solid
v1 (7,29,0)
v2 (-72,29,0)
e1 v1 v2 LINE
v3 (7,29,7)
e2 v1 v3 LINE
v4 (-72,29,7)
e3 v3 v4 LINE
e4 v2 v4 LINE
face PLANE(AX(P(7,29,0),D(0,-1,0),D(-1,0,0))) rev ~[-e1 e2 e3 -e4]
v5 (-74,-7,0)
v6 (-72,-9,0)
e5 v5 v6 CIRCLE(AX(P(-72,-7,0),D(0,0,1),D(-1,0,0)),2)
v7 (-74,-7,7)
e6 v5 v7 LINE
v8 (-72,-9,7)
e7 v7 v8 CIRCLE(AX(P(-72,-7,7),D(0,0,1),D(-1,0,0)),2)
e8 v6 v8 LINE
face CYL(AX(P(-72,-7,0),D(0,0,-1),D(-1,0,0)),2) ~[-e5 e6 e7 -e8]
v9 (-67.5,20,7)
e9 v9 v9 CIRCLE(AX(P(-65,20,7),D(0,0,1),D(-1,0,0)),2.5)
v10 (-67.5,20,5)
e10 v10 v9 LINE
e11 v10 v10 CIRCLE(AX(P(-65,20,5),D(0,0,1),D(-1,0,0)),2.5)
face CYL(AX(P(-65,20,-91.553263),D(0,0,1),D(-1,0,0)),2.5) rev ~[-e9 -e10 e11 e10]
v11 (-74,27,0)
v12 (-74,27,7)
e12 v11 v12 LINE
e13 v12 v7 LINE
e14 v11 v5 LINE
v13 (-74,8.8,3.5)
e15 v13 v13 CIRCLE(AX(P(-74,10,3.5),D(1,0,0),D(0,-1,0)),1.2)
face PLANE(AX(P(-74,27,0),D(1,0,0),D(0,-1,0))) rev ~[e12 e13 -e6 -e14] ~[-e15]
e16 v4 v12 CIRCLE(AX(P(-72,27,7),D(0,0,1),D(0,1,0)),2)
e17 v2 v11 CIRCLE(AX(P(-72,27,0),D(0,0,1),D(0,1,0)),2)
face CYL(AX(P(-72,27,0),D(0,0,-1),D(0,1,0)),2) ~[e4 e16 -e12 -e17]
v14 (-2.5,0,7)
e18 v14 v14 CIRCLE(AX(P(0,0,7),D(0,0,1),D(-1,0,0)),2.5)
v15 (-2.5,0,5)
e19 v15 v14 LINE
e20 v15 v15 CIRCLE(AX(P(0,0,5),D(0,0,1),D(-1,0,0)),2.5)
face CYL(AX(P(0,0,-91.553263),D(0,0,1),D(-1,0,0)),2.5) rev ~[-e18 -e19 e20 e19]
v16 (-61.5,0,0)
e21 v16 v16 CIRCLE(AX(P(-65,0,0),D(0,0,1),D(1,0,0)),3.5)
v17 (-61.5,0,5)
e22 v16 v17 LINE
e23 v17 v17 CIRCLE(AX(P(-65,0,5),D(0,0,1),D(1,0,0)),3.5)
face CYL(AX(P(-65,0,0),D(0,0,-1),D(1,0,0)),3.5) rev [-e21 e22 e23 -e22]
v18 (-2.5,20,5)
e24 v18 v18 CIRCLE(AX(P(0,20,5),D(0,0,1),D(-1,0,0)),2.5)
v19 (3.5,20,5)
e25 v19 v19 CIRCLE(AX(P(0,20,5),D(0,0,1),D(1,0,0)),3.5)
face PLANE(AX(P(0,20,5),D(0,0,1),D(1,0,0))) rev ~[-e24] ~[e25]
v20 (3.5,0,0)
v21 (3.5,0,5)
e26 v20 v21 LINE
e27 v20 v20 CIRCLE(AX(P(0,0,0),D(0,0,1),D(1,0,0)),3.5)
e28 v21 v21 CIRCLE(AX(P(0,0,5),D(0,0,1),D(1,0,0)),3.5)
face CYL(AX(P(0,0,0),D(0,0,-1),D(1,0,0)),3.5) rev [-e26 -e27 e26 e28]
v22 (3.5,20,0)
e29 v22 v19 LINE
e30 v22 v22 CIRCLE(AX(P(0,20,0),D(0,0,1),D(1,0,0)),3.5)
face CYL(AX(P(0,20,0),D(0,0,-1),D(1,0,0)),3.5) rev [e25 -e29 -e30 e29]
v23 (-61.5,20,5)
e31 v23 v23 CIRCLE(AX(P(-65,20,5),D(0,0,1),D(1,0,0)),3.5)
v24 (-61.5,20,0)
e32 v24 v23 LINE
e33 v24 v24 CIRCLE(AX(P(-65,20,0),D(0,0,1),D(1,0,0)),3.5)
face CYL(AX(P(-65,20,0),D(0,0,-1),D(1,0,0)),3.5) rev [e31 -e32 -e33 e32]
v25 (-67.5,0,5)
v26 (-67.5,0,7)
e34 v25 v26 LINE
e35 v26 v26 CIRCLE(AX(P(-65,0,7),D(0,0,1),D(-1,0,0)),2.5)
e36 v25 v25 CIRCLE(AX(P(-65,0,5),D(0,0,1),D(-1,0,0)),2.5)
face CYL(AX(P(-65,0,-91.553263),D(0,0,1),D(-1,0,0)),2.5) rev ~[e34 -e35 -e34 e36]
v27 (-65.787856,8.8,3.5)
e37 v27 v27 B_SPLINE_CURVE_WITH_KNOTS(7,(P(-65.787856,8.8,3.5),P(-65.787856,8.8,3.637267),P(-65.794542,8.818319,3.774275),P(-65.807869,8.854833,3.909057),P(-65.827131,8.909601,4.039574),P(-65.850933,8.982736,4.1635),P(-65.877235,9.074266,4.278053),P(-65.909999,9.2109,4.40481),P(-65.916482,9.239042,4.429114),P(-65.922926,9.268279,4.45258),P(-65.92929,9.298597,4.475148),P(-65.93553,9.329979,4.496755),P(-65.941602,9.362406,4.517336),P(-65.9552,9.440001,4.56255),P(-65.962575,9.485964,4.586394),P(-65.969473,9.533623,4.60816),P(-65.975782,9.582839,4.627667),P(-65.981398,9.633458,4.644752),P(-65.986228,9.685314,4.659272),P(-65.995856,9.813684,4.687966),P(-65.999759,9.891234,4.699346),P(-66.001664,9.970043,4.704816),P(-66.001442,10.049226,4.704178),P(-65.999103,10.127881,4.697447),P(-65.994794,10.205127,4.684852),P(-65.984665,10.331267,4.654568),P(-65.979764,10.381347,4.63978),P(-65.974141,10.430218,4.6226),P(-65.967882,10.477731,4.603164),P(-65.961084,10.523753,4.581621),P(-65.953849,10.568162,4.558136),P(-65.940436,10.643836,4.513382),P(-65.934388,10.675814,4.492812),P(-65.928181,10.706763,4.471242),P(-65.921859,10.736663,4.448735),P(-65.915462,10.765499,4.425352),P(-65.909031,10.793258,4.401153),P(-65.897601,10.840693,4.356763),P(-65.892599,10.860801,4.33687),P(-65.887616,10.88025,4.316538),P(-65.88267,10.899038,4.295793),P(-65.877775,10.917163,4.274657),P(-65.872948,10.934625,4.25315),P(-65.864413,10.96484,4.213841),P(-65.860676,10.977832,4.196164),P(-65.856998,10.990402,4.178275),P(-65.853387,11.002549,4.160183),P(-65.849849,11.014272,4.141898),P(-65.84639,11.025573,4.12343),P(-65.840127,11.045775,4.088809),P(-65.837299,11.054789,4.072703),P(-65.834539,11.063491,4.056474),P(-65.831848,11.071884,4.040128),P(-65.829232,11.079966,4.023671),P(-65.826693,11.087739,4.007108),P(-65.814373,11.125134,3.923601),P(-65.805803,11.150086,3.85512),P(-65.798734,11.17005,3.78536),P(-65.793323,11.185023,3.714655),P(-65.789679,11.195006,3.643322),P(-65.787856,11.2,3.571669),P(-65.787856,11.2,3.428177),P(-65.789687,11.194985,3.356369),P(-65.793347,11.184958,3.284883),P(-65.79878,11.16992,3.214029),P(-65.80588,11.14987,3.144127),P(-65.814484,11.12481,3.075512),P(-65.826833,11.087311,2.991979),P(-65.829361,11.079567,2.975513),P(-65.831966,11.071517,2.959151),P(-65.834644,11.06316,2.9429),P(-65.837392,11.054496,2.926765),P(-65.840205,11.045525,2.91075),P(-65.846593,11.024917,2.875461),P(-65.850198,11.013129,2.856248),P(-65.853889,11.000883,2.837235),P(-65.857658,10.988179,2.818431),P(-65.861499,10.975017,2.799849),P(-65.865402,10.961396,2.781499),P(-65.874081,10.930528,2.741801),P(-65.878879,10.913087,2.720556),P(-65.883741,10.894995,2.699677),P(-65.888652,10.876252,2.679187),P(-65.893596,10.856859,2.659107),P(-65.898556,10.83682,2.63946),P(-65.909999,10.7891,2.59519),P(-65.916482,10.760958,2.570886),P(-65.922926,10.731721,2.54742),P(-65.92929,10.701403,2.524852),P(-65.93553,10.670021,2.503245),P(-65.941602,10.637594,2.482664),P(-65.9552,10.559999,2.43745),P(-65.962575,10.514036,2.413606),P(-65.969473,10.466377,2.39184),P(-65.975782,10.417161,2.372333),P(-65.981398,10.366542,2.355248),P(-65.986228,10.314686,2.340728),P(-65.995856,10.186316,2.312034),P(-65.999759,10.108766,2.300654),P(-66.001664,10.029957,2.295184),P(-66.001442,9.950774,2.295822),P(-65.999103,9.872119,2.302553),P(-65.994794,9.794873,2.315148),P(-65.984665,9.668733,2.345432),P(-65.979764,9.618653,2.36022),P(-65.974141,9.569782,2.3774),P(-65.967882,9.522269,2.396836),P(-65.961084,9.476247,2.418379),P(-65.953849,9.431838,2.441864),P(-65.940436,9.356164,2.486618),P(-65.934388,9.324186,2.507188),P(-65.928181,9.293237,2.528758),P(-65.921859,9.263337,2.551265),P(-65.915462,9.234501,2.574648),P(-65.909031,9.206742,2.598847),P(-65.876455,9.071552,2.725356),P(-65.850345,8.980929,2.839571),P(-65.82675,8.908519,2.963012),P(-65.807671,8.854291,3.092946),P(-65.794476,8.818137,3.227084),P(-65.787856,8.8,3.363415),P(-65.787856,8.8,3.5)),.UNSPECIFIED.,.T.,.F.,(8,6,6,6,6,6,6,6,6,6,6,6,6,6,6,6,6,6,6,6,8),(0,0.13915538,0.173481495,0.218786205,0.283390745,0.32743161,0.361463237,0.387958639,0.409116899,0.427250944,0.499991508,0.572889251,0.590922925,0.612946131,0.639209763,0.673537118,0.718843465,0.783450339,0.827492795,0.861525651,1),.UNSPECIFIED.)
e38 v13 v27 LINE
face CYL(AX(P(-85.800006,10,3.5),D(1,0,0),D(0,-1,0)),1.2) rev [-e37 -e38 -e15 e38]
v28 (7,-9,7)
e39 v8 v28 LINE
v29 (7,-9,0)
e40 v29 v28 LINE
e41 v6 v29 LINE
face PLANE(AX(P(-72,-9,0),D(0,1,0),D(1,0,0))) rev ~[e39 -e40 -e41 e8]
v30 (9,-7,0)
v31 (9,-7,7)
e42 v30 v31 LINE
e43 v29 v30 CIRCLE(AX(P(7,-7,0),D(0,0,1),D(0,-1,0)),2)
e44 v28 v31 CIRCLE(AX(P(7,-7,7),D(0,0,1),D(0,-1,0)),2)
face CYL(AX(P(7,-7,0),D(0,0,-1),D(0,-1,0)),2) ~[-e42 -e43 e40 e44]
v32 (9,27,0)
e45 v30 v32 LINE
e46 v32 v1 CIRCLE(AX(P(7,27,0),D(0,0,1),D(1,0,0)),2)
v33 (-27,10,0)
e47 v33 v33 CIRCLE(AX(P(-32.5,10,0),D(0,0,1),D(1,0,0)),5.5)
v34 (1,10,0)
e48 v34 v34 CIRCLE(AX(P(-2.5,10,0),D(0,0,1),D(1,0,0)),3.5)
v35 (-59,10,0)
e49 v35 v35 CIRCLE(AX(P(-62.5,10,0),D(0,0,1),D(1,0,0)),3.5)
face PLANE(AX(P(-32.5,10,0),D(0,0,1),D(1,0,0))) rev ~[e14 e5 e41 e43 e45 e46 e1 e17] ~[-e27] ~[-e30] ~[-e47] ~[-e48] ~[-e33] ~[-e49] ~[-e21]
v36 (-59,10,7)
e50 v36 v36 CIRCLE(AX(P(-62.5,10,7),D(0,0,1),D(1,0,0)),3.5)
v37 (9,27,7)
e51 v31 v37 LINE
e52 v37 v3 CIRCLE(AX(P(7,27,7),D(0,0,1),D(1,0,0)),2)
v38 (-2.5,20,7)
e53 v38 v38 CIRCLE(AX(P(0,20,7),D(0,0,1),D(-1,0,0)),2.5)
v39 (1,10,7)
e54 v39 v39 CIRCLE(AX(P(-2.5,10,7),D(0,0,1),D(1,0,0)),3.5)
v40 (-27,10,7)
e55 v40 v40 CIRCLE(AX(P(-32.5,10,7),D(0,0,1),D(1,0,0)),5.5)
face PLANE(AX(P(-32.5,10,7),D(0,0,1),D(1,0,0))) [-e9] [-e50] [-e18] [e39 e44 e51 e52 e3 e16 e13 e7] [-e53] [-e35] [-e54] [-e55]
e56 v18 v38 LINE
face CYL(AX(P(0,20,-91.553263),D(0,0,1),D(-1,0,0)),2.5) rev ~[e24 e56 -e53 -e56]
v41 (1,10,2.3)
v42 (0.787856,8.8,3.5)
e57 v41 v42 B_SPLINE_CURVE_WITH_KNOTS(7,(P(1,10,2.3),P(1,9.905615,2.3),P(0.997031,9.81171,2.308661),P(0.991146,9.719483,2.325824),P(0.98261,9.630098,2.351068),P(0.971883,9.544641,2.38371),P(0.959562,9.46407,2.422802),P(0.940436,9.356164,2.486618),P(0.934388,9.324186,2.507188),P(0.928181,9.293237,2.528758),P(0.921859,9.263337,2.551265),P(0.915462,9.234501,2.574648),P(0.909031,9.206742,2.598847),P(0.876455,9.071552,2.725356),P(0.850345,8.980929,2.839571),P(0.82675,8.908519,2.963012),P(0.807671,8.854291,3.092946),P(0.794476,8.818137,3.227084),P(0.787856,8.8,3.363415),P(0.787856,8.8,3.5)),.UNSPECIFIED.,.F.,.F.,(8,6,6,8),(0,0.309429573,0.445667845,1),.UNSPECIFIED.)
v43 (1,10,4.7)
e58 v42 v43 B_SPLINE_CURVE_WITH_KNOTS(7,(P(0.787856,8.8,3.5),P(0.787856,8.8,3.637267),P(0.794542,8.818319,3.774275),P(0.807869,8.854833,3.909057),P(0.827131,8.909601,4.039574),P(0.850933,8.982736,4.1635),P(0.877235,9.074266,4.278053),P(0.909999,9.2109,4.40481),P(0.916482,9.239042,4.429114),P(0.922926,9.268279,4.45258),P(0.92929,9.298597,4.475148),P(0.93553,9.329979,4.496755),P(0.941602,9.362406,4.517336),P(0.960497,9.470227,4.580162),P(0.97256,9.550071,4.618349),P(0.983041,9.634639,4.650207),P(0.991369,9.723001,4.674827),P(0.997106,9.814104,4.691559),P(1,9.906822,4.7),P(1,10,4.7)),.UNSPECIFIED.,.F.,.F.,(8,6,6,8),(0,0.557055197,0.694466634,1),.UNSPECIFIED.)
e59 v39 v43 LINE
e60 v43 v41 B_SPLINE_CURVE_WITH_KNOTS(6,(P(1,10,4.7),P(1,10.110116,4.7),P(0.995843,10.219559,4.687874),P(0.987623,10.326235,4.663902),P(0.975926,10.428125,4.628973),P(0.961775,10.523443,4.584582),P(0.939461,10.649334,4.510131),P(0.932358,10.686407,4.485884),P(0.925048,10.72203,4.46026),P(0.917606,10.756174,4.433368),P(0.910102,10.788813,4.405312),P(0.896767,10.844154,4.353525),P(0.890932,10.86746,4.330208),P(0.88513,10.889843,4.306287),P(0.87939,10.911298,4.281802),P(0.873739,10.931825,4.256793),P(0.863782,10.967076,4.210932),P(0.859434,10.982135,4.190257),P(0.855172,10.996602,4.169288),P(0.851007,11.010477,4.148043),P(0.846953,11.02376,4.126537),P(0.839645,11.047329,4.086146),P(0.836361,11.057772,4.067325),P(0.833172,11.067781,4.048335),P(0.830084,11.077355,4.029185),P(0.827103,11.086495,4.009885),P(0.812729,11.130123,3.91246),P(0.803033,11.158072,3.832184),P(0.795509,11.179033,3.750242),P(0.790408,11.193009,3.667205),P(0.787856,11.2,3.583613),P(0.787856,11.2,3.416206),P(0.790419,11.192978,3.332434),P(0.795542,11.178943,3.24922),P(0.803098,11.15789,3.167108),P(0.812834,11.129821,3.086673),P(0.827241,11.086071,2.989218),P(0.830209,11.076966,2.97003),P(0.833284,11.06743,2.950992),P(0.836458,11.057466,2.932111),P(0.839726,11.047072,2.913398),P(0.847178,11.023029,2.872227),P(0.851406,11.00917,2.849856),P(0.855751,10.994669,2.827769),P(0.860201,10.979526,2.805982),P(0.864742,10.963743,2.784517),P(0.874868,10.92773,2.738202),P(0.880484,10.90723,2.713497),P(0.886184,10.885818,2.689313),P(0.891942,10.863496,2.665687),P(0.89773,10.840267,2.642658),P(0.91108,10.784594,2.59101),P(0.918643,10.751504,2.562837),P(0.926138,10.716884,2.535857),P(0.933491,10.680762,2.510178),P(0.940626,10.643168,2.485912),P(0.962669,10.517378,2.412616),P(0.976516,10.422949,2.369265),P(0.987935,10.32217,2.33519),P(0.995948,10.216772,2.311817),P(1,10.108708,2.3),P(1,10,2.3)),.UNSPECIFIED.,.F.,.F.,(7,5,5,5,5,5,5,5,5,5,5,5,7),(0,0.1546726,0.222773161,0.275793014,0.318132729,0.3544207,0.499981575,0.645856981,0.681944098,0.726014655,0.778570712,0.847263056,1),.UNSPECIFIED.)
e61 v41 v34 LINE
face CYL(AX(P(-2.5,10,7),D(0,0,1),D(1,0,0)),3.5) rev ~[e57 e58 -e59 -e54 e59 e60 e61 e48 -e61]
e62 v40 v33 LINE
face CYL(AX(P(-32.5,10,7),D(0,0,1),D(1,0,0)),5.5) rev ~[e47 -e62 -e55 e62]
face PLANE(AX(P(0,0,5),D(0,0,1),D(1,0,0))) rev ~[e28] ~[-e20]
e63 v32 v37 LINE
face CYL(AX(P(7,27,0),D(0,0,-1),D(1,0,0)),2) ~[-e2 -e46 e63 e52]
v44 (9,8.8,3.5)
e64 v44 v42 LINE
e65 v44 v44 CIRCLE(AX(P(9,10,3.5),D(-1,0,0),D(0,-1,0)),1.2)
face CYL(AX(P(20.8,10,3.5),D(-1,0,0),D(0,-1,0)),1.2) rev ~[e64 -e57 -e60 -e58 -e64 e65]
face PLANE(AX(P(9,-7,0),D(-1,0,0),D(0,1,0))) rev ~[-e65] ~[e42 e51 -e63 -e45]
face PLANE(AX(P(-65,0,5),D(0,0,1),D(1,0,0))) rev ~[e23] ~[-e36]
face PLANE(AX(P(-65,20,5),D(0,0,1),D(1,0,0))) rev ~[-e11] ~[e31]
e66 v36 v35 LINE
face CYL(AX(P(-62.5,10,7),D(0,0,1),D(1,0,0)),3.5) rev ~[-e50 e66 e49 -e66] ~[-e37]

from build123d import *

# Parameters (mm, degrees)
F0_W      = 65
F0_H      = 20
F1_DEPTH  = 7
F2_D      = 5
F3_R      = 3.5
F4_DEPTH  = 25
F6_D      = 2.4
F6_DEPTH  = 11.8
F6_TIP    = 0.7210327428
F8_R      = 5.5
F9_DEPTH  = 25
F10_R     = 3.5
F11_DEPTH = 5


# Not quite as in the source:
# - a pattern or mirror of a feature is missing from the dataset's text; its kind, count and spacing are read off the source's solid


with BuildPart() as f1:
    # F0 (on Top) → F1 (new body)
    with BuildSketch(Plane.XY):
        with BuildLine():
            ThreePointArc((9, 27), (8.4142135624, 28.4142135624), (7, 29))
            Line((7, 29), (-72, 29))
            ThreePointArc((-72, 29), (-73.4142135624, 28.4142135624), (-74, 27))
            Line((-74, 27), (-74, -7))
            ThreePointArc((-74, -7), (-73.4142135624, -8.4142135624), (-72, -9))
            Line((-72, -9), (7, -9))
            ThreePointArc((7, -9), (8.4142135624, -8.4142135624), (9, -7))
            Line((9, -7), (9, 27))
        make_face()
        with Locations((-32.5, 10)):
            Rectangle(F0_W, F0_H, mode=Mode.SUBTRACT)
        with Locations((-32.5, 10)):
            Rectangle(F0_W, F0_H)
    extrude(amount=F1_DEPTH)

    # F2 (through all)
    with Locations(Plane(origin=(0, 0, 0), x_dir=(1, 0, 0), z_dir=(0, 0, -1))):
        with Locations((-65, -20), (-65, 0), (0, 0), (0, -20)):
            Hole(F2_D / 2)

    # F3 (on face) → F4 (cut)
    with BuildSketch(Plane.XY.offset(7)):
        with Locations((-62.5, 10)):
            Circle(F3_R)
        with Locations((-2.5, 10)):
            Circle(F3_R)
    extrude(amount=-F4_DEPTH, mode=Mode.SUBTRACT)

    # F6
    with Locations(Plane.YZ.offset(9)):
        with Locations((10, 3.5)):
            f6 = Hole(F6_D / 2, depth=F6_DEPTH)
            with Locations((0, 0, -(F6_DEPTH + F6_TIP / 2))):  # 118° drill point
                Cone(0, F6_D / 2, F6_TIP, mode=Mode.SUBTRACT)

    # F6_copies: F6 across plane
    add(f6.mirror(Plane(origin=(-32.500003, -1e-06, 0), x_dir=(0, 0, -1), z_dir=(-1, 0, 0))), mode=Mode.SUBTRACT)

    # F8 (on face) → F9 (cut)
    with BuildSketch(Plane.XY.offset(7)):
        with Locations((-32.5, 10)):
            Circle(F8_R)
    extrude(amount=-F9_DEPTH, mode=Mode.SUBTRACT)

    # F10 (on face) → F11 (cut)
    with BuildSketch(Plane.XY):
        Circle(F10_R)
        with Locations((-65, 0)):
            Circle(F10_R)
        with Locations((0, 20)):
            Circle(F10_R)
        with Locations((-65, 20)):
            Circle(F10_R)
    extrude(amount=F11_DEPTH, mode=Mode.SUBTRACT)


solid = f1.part
